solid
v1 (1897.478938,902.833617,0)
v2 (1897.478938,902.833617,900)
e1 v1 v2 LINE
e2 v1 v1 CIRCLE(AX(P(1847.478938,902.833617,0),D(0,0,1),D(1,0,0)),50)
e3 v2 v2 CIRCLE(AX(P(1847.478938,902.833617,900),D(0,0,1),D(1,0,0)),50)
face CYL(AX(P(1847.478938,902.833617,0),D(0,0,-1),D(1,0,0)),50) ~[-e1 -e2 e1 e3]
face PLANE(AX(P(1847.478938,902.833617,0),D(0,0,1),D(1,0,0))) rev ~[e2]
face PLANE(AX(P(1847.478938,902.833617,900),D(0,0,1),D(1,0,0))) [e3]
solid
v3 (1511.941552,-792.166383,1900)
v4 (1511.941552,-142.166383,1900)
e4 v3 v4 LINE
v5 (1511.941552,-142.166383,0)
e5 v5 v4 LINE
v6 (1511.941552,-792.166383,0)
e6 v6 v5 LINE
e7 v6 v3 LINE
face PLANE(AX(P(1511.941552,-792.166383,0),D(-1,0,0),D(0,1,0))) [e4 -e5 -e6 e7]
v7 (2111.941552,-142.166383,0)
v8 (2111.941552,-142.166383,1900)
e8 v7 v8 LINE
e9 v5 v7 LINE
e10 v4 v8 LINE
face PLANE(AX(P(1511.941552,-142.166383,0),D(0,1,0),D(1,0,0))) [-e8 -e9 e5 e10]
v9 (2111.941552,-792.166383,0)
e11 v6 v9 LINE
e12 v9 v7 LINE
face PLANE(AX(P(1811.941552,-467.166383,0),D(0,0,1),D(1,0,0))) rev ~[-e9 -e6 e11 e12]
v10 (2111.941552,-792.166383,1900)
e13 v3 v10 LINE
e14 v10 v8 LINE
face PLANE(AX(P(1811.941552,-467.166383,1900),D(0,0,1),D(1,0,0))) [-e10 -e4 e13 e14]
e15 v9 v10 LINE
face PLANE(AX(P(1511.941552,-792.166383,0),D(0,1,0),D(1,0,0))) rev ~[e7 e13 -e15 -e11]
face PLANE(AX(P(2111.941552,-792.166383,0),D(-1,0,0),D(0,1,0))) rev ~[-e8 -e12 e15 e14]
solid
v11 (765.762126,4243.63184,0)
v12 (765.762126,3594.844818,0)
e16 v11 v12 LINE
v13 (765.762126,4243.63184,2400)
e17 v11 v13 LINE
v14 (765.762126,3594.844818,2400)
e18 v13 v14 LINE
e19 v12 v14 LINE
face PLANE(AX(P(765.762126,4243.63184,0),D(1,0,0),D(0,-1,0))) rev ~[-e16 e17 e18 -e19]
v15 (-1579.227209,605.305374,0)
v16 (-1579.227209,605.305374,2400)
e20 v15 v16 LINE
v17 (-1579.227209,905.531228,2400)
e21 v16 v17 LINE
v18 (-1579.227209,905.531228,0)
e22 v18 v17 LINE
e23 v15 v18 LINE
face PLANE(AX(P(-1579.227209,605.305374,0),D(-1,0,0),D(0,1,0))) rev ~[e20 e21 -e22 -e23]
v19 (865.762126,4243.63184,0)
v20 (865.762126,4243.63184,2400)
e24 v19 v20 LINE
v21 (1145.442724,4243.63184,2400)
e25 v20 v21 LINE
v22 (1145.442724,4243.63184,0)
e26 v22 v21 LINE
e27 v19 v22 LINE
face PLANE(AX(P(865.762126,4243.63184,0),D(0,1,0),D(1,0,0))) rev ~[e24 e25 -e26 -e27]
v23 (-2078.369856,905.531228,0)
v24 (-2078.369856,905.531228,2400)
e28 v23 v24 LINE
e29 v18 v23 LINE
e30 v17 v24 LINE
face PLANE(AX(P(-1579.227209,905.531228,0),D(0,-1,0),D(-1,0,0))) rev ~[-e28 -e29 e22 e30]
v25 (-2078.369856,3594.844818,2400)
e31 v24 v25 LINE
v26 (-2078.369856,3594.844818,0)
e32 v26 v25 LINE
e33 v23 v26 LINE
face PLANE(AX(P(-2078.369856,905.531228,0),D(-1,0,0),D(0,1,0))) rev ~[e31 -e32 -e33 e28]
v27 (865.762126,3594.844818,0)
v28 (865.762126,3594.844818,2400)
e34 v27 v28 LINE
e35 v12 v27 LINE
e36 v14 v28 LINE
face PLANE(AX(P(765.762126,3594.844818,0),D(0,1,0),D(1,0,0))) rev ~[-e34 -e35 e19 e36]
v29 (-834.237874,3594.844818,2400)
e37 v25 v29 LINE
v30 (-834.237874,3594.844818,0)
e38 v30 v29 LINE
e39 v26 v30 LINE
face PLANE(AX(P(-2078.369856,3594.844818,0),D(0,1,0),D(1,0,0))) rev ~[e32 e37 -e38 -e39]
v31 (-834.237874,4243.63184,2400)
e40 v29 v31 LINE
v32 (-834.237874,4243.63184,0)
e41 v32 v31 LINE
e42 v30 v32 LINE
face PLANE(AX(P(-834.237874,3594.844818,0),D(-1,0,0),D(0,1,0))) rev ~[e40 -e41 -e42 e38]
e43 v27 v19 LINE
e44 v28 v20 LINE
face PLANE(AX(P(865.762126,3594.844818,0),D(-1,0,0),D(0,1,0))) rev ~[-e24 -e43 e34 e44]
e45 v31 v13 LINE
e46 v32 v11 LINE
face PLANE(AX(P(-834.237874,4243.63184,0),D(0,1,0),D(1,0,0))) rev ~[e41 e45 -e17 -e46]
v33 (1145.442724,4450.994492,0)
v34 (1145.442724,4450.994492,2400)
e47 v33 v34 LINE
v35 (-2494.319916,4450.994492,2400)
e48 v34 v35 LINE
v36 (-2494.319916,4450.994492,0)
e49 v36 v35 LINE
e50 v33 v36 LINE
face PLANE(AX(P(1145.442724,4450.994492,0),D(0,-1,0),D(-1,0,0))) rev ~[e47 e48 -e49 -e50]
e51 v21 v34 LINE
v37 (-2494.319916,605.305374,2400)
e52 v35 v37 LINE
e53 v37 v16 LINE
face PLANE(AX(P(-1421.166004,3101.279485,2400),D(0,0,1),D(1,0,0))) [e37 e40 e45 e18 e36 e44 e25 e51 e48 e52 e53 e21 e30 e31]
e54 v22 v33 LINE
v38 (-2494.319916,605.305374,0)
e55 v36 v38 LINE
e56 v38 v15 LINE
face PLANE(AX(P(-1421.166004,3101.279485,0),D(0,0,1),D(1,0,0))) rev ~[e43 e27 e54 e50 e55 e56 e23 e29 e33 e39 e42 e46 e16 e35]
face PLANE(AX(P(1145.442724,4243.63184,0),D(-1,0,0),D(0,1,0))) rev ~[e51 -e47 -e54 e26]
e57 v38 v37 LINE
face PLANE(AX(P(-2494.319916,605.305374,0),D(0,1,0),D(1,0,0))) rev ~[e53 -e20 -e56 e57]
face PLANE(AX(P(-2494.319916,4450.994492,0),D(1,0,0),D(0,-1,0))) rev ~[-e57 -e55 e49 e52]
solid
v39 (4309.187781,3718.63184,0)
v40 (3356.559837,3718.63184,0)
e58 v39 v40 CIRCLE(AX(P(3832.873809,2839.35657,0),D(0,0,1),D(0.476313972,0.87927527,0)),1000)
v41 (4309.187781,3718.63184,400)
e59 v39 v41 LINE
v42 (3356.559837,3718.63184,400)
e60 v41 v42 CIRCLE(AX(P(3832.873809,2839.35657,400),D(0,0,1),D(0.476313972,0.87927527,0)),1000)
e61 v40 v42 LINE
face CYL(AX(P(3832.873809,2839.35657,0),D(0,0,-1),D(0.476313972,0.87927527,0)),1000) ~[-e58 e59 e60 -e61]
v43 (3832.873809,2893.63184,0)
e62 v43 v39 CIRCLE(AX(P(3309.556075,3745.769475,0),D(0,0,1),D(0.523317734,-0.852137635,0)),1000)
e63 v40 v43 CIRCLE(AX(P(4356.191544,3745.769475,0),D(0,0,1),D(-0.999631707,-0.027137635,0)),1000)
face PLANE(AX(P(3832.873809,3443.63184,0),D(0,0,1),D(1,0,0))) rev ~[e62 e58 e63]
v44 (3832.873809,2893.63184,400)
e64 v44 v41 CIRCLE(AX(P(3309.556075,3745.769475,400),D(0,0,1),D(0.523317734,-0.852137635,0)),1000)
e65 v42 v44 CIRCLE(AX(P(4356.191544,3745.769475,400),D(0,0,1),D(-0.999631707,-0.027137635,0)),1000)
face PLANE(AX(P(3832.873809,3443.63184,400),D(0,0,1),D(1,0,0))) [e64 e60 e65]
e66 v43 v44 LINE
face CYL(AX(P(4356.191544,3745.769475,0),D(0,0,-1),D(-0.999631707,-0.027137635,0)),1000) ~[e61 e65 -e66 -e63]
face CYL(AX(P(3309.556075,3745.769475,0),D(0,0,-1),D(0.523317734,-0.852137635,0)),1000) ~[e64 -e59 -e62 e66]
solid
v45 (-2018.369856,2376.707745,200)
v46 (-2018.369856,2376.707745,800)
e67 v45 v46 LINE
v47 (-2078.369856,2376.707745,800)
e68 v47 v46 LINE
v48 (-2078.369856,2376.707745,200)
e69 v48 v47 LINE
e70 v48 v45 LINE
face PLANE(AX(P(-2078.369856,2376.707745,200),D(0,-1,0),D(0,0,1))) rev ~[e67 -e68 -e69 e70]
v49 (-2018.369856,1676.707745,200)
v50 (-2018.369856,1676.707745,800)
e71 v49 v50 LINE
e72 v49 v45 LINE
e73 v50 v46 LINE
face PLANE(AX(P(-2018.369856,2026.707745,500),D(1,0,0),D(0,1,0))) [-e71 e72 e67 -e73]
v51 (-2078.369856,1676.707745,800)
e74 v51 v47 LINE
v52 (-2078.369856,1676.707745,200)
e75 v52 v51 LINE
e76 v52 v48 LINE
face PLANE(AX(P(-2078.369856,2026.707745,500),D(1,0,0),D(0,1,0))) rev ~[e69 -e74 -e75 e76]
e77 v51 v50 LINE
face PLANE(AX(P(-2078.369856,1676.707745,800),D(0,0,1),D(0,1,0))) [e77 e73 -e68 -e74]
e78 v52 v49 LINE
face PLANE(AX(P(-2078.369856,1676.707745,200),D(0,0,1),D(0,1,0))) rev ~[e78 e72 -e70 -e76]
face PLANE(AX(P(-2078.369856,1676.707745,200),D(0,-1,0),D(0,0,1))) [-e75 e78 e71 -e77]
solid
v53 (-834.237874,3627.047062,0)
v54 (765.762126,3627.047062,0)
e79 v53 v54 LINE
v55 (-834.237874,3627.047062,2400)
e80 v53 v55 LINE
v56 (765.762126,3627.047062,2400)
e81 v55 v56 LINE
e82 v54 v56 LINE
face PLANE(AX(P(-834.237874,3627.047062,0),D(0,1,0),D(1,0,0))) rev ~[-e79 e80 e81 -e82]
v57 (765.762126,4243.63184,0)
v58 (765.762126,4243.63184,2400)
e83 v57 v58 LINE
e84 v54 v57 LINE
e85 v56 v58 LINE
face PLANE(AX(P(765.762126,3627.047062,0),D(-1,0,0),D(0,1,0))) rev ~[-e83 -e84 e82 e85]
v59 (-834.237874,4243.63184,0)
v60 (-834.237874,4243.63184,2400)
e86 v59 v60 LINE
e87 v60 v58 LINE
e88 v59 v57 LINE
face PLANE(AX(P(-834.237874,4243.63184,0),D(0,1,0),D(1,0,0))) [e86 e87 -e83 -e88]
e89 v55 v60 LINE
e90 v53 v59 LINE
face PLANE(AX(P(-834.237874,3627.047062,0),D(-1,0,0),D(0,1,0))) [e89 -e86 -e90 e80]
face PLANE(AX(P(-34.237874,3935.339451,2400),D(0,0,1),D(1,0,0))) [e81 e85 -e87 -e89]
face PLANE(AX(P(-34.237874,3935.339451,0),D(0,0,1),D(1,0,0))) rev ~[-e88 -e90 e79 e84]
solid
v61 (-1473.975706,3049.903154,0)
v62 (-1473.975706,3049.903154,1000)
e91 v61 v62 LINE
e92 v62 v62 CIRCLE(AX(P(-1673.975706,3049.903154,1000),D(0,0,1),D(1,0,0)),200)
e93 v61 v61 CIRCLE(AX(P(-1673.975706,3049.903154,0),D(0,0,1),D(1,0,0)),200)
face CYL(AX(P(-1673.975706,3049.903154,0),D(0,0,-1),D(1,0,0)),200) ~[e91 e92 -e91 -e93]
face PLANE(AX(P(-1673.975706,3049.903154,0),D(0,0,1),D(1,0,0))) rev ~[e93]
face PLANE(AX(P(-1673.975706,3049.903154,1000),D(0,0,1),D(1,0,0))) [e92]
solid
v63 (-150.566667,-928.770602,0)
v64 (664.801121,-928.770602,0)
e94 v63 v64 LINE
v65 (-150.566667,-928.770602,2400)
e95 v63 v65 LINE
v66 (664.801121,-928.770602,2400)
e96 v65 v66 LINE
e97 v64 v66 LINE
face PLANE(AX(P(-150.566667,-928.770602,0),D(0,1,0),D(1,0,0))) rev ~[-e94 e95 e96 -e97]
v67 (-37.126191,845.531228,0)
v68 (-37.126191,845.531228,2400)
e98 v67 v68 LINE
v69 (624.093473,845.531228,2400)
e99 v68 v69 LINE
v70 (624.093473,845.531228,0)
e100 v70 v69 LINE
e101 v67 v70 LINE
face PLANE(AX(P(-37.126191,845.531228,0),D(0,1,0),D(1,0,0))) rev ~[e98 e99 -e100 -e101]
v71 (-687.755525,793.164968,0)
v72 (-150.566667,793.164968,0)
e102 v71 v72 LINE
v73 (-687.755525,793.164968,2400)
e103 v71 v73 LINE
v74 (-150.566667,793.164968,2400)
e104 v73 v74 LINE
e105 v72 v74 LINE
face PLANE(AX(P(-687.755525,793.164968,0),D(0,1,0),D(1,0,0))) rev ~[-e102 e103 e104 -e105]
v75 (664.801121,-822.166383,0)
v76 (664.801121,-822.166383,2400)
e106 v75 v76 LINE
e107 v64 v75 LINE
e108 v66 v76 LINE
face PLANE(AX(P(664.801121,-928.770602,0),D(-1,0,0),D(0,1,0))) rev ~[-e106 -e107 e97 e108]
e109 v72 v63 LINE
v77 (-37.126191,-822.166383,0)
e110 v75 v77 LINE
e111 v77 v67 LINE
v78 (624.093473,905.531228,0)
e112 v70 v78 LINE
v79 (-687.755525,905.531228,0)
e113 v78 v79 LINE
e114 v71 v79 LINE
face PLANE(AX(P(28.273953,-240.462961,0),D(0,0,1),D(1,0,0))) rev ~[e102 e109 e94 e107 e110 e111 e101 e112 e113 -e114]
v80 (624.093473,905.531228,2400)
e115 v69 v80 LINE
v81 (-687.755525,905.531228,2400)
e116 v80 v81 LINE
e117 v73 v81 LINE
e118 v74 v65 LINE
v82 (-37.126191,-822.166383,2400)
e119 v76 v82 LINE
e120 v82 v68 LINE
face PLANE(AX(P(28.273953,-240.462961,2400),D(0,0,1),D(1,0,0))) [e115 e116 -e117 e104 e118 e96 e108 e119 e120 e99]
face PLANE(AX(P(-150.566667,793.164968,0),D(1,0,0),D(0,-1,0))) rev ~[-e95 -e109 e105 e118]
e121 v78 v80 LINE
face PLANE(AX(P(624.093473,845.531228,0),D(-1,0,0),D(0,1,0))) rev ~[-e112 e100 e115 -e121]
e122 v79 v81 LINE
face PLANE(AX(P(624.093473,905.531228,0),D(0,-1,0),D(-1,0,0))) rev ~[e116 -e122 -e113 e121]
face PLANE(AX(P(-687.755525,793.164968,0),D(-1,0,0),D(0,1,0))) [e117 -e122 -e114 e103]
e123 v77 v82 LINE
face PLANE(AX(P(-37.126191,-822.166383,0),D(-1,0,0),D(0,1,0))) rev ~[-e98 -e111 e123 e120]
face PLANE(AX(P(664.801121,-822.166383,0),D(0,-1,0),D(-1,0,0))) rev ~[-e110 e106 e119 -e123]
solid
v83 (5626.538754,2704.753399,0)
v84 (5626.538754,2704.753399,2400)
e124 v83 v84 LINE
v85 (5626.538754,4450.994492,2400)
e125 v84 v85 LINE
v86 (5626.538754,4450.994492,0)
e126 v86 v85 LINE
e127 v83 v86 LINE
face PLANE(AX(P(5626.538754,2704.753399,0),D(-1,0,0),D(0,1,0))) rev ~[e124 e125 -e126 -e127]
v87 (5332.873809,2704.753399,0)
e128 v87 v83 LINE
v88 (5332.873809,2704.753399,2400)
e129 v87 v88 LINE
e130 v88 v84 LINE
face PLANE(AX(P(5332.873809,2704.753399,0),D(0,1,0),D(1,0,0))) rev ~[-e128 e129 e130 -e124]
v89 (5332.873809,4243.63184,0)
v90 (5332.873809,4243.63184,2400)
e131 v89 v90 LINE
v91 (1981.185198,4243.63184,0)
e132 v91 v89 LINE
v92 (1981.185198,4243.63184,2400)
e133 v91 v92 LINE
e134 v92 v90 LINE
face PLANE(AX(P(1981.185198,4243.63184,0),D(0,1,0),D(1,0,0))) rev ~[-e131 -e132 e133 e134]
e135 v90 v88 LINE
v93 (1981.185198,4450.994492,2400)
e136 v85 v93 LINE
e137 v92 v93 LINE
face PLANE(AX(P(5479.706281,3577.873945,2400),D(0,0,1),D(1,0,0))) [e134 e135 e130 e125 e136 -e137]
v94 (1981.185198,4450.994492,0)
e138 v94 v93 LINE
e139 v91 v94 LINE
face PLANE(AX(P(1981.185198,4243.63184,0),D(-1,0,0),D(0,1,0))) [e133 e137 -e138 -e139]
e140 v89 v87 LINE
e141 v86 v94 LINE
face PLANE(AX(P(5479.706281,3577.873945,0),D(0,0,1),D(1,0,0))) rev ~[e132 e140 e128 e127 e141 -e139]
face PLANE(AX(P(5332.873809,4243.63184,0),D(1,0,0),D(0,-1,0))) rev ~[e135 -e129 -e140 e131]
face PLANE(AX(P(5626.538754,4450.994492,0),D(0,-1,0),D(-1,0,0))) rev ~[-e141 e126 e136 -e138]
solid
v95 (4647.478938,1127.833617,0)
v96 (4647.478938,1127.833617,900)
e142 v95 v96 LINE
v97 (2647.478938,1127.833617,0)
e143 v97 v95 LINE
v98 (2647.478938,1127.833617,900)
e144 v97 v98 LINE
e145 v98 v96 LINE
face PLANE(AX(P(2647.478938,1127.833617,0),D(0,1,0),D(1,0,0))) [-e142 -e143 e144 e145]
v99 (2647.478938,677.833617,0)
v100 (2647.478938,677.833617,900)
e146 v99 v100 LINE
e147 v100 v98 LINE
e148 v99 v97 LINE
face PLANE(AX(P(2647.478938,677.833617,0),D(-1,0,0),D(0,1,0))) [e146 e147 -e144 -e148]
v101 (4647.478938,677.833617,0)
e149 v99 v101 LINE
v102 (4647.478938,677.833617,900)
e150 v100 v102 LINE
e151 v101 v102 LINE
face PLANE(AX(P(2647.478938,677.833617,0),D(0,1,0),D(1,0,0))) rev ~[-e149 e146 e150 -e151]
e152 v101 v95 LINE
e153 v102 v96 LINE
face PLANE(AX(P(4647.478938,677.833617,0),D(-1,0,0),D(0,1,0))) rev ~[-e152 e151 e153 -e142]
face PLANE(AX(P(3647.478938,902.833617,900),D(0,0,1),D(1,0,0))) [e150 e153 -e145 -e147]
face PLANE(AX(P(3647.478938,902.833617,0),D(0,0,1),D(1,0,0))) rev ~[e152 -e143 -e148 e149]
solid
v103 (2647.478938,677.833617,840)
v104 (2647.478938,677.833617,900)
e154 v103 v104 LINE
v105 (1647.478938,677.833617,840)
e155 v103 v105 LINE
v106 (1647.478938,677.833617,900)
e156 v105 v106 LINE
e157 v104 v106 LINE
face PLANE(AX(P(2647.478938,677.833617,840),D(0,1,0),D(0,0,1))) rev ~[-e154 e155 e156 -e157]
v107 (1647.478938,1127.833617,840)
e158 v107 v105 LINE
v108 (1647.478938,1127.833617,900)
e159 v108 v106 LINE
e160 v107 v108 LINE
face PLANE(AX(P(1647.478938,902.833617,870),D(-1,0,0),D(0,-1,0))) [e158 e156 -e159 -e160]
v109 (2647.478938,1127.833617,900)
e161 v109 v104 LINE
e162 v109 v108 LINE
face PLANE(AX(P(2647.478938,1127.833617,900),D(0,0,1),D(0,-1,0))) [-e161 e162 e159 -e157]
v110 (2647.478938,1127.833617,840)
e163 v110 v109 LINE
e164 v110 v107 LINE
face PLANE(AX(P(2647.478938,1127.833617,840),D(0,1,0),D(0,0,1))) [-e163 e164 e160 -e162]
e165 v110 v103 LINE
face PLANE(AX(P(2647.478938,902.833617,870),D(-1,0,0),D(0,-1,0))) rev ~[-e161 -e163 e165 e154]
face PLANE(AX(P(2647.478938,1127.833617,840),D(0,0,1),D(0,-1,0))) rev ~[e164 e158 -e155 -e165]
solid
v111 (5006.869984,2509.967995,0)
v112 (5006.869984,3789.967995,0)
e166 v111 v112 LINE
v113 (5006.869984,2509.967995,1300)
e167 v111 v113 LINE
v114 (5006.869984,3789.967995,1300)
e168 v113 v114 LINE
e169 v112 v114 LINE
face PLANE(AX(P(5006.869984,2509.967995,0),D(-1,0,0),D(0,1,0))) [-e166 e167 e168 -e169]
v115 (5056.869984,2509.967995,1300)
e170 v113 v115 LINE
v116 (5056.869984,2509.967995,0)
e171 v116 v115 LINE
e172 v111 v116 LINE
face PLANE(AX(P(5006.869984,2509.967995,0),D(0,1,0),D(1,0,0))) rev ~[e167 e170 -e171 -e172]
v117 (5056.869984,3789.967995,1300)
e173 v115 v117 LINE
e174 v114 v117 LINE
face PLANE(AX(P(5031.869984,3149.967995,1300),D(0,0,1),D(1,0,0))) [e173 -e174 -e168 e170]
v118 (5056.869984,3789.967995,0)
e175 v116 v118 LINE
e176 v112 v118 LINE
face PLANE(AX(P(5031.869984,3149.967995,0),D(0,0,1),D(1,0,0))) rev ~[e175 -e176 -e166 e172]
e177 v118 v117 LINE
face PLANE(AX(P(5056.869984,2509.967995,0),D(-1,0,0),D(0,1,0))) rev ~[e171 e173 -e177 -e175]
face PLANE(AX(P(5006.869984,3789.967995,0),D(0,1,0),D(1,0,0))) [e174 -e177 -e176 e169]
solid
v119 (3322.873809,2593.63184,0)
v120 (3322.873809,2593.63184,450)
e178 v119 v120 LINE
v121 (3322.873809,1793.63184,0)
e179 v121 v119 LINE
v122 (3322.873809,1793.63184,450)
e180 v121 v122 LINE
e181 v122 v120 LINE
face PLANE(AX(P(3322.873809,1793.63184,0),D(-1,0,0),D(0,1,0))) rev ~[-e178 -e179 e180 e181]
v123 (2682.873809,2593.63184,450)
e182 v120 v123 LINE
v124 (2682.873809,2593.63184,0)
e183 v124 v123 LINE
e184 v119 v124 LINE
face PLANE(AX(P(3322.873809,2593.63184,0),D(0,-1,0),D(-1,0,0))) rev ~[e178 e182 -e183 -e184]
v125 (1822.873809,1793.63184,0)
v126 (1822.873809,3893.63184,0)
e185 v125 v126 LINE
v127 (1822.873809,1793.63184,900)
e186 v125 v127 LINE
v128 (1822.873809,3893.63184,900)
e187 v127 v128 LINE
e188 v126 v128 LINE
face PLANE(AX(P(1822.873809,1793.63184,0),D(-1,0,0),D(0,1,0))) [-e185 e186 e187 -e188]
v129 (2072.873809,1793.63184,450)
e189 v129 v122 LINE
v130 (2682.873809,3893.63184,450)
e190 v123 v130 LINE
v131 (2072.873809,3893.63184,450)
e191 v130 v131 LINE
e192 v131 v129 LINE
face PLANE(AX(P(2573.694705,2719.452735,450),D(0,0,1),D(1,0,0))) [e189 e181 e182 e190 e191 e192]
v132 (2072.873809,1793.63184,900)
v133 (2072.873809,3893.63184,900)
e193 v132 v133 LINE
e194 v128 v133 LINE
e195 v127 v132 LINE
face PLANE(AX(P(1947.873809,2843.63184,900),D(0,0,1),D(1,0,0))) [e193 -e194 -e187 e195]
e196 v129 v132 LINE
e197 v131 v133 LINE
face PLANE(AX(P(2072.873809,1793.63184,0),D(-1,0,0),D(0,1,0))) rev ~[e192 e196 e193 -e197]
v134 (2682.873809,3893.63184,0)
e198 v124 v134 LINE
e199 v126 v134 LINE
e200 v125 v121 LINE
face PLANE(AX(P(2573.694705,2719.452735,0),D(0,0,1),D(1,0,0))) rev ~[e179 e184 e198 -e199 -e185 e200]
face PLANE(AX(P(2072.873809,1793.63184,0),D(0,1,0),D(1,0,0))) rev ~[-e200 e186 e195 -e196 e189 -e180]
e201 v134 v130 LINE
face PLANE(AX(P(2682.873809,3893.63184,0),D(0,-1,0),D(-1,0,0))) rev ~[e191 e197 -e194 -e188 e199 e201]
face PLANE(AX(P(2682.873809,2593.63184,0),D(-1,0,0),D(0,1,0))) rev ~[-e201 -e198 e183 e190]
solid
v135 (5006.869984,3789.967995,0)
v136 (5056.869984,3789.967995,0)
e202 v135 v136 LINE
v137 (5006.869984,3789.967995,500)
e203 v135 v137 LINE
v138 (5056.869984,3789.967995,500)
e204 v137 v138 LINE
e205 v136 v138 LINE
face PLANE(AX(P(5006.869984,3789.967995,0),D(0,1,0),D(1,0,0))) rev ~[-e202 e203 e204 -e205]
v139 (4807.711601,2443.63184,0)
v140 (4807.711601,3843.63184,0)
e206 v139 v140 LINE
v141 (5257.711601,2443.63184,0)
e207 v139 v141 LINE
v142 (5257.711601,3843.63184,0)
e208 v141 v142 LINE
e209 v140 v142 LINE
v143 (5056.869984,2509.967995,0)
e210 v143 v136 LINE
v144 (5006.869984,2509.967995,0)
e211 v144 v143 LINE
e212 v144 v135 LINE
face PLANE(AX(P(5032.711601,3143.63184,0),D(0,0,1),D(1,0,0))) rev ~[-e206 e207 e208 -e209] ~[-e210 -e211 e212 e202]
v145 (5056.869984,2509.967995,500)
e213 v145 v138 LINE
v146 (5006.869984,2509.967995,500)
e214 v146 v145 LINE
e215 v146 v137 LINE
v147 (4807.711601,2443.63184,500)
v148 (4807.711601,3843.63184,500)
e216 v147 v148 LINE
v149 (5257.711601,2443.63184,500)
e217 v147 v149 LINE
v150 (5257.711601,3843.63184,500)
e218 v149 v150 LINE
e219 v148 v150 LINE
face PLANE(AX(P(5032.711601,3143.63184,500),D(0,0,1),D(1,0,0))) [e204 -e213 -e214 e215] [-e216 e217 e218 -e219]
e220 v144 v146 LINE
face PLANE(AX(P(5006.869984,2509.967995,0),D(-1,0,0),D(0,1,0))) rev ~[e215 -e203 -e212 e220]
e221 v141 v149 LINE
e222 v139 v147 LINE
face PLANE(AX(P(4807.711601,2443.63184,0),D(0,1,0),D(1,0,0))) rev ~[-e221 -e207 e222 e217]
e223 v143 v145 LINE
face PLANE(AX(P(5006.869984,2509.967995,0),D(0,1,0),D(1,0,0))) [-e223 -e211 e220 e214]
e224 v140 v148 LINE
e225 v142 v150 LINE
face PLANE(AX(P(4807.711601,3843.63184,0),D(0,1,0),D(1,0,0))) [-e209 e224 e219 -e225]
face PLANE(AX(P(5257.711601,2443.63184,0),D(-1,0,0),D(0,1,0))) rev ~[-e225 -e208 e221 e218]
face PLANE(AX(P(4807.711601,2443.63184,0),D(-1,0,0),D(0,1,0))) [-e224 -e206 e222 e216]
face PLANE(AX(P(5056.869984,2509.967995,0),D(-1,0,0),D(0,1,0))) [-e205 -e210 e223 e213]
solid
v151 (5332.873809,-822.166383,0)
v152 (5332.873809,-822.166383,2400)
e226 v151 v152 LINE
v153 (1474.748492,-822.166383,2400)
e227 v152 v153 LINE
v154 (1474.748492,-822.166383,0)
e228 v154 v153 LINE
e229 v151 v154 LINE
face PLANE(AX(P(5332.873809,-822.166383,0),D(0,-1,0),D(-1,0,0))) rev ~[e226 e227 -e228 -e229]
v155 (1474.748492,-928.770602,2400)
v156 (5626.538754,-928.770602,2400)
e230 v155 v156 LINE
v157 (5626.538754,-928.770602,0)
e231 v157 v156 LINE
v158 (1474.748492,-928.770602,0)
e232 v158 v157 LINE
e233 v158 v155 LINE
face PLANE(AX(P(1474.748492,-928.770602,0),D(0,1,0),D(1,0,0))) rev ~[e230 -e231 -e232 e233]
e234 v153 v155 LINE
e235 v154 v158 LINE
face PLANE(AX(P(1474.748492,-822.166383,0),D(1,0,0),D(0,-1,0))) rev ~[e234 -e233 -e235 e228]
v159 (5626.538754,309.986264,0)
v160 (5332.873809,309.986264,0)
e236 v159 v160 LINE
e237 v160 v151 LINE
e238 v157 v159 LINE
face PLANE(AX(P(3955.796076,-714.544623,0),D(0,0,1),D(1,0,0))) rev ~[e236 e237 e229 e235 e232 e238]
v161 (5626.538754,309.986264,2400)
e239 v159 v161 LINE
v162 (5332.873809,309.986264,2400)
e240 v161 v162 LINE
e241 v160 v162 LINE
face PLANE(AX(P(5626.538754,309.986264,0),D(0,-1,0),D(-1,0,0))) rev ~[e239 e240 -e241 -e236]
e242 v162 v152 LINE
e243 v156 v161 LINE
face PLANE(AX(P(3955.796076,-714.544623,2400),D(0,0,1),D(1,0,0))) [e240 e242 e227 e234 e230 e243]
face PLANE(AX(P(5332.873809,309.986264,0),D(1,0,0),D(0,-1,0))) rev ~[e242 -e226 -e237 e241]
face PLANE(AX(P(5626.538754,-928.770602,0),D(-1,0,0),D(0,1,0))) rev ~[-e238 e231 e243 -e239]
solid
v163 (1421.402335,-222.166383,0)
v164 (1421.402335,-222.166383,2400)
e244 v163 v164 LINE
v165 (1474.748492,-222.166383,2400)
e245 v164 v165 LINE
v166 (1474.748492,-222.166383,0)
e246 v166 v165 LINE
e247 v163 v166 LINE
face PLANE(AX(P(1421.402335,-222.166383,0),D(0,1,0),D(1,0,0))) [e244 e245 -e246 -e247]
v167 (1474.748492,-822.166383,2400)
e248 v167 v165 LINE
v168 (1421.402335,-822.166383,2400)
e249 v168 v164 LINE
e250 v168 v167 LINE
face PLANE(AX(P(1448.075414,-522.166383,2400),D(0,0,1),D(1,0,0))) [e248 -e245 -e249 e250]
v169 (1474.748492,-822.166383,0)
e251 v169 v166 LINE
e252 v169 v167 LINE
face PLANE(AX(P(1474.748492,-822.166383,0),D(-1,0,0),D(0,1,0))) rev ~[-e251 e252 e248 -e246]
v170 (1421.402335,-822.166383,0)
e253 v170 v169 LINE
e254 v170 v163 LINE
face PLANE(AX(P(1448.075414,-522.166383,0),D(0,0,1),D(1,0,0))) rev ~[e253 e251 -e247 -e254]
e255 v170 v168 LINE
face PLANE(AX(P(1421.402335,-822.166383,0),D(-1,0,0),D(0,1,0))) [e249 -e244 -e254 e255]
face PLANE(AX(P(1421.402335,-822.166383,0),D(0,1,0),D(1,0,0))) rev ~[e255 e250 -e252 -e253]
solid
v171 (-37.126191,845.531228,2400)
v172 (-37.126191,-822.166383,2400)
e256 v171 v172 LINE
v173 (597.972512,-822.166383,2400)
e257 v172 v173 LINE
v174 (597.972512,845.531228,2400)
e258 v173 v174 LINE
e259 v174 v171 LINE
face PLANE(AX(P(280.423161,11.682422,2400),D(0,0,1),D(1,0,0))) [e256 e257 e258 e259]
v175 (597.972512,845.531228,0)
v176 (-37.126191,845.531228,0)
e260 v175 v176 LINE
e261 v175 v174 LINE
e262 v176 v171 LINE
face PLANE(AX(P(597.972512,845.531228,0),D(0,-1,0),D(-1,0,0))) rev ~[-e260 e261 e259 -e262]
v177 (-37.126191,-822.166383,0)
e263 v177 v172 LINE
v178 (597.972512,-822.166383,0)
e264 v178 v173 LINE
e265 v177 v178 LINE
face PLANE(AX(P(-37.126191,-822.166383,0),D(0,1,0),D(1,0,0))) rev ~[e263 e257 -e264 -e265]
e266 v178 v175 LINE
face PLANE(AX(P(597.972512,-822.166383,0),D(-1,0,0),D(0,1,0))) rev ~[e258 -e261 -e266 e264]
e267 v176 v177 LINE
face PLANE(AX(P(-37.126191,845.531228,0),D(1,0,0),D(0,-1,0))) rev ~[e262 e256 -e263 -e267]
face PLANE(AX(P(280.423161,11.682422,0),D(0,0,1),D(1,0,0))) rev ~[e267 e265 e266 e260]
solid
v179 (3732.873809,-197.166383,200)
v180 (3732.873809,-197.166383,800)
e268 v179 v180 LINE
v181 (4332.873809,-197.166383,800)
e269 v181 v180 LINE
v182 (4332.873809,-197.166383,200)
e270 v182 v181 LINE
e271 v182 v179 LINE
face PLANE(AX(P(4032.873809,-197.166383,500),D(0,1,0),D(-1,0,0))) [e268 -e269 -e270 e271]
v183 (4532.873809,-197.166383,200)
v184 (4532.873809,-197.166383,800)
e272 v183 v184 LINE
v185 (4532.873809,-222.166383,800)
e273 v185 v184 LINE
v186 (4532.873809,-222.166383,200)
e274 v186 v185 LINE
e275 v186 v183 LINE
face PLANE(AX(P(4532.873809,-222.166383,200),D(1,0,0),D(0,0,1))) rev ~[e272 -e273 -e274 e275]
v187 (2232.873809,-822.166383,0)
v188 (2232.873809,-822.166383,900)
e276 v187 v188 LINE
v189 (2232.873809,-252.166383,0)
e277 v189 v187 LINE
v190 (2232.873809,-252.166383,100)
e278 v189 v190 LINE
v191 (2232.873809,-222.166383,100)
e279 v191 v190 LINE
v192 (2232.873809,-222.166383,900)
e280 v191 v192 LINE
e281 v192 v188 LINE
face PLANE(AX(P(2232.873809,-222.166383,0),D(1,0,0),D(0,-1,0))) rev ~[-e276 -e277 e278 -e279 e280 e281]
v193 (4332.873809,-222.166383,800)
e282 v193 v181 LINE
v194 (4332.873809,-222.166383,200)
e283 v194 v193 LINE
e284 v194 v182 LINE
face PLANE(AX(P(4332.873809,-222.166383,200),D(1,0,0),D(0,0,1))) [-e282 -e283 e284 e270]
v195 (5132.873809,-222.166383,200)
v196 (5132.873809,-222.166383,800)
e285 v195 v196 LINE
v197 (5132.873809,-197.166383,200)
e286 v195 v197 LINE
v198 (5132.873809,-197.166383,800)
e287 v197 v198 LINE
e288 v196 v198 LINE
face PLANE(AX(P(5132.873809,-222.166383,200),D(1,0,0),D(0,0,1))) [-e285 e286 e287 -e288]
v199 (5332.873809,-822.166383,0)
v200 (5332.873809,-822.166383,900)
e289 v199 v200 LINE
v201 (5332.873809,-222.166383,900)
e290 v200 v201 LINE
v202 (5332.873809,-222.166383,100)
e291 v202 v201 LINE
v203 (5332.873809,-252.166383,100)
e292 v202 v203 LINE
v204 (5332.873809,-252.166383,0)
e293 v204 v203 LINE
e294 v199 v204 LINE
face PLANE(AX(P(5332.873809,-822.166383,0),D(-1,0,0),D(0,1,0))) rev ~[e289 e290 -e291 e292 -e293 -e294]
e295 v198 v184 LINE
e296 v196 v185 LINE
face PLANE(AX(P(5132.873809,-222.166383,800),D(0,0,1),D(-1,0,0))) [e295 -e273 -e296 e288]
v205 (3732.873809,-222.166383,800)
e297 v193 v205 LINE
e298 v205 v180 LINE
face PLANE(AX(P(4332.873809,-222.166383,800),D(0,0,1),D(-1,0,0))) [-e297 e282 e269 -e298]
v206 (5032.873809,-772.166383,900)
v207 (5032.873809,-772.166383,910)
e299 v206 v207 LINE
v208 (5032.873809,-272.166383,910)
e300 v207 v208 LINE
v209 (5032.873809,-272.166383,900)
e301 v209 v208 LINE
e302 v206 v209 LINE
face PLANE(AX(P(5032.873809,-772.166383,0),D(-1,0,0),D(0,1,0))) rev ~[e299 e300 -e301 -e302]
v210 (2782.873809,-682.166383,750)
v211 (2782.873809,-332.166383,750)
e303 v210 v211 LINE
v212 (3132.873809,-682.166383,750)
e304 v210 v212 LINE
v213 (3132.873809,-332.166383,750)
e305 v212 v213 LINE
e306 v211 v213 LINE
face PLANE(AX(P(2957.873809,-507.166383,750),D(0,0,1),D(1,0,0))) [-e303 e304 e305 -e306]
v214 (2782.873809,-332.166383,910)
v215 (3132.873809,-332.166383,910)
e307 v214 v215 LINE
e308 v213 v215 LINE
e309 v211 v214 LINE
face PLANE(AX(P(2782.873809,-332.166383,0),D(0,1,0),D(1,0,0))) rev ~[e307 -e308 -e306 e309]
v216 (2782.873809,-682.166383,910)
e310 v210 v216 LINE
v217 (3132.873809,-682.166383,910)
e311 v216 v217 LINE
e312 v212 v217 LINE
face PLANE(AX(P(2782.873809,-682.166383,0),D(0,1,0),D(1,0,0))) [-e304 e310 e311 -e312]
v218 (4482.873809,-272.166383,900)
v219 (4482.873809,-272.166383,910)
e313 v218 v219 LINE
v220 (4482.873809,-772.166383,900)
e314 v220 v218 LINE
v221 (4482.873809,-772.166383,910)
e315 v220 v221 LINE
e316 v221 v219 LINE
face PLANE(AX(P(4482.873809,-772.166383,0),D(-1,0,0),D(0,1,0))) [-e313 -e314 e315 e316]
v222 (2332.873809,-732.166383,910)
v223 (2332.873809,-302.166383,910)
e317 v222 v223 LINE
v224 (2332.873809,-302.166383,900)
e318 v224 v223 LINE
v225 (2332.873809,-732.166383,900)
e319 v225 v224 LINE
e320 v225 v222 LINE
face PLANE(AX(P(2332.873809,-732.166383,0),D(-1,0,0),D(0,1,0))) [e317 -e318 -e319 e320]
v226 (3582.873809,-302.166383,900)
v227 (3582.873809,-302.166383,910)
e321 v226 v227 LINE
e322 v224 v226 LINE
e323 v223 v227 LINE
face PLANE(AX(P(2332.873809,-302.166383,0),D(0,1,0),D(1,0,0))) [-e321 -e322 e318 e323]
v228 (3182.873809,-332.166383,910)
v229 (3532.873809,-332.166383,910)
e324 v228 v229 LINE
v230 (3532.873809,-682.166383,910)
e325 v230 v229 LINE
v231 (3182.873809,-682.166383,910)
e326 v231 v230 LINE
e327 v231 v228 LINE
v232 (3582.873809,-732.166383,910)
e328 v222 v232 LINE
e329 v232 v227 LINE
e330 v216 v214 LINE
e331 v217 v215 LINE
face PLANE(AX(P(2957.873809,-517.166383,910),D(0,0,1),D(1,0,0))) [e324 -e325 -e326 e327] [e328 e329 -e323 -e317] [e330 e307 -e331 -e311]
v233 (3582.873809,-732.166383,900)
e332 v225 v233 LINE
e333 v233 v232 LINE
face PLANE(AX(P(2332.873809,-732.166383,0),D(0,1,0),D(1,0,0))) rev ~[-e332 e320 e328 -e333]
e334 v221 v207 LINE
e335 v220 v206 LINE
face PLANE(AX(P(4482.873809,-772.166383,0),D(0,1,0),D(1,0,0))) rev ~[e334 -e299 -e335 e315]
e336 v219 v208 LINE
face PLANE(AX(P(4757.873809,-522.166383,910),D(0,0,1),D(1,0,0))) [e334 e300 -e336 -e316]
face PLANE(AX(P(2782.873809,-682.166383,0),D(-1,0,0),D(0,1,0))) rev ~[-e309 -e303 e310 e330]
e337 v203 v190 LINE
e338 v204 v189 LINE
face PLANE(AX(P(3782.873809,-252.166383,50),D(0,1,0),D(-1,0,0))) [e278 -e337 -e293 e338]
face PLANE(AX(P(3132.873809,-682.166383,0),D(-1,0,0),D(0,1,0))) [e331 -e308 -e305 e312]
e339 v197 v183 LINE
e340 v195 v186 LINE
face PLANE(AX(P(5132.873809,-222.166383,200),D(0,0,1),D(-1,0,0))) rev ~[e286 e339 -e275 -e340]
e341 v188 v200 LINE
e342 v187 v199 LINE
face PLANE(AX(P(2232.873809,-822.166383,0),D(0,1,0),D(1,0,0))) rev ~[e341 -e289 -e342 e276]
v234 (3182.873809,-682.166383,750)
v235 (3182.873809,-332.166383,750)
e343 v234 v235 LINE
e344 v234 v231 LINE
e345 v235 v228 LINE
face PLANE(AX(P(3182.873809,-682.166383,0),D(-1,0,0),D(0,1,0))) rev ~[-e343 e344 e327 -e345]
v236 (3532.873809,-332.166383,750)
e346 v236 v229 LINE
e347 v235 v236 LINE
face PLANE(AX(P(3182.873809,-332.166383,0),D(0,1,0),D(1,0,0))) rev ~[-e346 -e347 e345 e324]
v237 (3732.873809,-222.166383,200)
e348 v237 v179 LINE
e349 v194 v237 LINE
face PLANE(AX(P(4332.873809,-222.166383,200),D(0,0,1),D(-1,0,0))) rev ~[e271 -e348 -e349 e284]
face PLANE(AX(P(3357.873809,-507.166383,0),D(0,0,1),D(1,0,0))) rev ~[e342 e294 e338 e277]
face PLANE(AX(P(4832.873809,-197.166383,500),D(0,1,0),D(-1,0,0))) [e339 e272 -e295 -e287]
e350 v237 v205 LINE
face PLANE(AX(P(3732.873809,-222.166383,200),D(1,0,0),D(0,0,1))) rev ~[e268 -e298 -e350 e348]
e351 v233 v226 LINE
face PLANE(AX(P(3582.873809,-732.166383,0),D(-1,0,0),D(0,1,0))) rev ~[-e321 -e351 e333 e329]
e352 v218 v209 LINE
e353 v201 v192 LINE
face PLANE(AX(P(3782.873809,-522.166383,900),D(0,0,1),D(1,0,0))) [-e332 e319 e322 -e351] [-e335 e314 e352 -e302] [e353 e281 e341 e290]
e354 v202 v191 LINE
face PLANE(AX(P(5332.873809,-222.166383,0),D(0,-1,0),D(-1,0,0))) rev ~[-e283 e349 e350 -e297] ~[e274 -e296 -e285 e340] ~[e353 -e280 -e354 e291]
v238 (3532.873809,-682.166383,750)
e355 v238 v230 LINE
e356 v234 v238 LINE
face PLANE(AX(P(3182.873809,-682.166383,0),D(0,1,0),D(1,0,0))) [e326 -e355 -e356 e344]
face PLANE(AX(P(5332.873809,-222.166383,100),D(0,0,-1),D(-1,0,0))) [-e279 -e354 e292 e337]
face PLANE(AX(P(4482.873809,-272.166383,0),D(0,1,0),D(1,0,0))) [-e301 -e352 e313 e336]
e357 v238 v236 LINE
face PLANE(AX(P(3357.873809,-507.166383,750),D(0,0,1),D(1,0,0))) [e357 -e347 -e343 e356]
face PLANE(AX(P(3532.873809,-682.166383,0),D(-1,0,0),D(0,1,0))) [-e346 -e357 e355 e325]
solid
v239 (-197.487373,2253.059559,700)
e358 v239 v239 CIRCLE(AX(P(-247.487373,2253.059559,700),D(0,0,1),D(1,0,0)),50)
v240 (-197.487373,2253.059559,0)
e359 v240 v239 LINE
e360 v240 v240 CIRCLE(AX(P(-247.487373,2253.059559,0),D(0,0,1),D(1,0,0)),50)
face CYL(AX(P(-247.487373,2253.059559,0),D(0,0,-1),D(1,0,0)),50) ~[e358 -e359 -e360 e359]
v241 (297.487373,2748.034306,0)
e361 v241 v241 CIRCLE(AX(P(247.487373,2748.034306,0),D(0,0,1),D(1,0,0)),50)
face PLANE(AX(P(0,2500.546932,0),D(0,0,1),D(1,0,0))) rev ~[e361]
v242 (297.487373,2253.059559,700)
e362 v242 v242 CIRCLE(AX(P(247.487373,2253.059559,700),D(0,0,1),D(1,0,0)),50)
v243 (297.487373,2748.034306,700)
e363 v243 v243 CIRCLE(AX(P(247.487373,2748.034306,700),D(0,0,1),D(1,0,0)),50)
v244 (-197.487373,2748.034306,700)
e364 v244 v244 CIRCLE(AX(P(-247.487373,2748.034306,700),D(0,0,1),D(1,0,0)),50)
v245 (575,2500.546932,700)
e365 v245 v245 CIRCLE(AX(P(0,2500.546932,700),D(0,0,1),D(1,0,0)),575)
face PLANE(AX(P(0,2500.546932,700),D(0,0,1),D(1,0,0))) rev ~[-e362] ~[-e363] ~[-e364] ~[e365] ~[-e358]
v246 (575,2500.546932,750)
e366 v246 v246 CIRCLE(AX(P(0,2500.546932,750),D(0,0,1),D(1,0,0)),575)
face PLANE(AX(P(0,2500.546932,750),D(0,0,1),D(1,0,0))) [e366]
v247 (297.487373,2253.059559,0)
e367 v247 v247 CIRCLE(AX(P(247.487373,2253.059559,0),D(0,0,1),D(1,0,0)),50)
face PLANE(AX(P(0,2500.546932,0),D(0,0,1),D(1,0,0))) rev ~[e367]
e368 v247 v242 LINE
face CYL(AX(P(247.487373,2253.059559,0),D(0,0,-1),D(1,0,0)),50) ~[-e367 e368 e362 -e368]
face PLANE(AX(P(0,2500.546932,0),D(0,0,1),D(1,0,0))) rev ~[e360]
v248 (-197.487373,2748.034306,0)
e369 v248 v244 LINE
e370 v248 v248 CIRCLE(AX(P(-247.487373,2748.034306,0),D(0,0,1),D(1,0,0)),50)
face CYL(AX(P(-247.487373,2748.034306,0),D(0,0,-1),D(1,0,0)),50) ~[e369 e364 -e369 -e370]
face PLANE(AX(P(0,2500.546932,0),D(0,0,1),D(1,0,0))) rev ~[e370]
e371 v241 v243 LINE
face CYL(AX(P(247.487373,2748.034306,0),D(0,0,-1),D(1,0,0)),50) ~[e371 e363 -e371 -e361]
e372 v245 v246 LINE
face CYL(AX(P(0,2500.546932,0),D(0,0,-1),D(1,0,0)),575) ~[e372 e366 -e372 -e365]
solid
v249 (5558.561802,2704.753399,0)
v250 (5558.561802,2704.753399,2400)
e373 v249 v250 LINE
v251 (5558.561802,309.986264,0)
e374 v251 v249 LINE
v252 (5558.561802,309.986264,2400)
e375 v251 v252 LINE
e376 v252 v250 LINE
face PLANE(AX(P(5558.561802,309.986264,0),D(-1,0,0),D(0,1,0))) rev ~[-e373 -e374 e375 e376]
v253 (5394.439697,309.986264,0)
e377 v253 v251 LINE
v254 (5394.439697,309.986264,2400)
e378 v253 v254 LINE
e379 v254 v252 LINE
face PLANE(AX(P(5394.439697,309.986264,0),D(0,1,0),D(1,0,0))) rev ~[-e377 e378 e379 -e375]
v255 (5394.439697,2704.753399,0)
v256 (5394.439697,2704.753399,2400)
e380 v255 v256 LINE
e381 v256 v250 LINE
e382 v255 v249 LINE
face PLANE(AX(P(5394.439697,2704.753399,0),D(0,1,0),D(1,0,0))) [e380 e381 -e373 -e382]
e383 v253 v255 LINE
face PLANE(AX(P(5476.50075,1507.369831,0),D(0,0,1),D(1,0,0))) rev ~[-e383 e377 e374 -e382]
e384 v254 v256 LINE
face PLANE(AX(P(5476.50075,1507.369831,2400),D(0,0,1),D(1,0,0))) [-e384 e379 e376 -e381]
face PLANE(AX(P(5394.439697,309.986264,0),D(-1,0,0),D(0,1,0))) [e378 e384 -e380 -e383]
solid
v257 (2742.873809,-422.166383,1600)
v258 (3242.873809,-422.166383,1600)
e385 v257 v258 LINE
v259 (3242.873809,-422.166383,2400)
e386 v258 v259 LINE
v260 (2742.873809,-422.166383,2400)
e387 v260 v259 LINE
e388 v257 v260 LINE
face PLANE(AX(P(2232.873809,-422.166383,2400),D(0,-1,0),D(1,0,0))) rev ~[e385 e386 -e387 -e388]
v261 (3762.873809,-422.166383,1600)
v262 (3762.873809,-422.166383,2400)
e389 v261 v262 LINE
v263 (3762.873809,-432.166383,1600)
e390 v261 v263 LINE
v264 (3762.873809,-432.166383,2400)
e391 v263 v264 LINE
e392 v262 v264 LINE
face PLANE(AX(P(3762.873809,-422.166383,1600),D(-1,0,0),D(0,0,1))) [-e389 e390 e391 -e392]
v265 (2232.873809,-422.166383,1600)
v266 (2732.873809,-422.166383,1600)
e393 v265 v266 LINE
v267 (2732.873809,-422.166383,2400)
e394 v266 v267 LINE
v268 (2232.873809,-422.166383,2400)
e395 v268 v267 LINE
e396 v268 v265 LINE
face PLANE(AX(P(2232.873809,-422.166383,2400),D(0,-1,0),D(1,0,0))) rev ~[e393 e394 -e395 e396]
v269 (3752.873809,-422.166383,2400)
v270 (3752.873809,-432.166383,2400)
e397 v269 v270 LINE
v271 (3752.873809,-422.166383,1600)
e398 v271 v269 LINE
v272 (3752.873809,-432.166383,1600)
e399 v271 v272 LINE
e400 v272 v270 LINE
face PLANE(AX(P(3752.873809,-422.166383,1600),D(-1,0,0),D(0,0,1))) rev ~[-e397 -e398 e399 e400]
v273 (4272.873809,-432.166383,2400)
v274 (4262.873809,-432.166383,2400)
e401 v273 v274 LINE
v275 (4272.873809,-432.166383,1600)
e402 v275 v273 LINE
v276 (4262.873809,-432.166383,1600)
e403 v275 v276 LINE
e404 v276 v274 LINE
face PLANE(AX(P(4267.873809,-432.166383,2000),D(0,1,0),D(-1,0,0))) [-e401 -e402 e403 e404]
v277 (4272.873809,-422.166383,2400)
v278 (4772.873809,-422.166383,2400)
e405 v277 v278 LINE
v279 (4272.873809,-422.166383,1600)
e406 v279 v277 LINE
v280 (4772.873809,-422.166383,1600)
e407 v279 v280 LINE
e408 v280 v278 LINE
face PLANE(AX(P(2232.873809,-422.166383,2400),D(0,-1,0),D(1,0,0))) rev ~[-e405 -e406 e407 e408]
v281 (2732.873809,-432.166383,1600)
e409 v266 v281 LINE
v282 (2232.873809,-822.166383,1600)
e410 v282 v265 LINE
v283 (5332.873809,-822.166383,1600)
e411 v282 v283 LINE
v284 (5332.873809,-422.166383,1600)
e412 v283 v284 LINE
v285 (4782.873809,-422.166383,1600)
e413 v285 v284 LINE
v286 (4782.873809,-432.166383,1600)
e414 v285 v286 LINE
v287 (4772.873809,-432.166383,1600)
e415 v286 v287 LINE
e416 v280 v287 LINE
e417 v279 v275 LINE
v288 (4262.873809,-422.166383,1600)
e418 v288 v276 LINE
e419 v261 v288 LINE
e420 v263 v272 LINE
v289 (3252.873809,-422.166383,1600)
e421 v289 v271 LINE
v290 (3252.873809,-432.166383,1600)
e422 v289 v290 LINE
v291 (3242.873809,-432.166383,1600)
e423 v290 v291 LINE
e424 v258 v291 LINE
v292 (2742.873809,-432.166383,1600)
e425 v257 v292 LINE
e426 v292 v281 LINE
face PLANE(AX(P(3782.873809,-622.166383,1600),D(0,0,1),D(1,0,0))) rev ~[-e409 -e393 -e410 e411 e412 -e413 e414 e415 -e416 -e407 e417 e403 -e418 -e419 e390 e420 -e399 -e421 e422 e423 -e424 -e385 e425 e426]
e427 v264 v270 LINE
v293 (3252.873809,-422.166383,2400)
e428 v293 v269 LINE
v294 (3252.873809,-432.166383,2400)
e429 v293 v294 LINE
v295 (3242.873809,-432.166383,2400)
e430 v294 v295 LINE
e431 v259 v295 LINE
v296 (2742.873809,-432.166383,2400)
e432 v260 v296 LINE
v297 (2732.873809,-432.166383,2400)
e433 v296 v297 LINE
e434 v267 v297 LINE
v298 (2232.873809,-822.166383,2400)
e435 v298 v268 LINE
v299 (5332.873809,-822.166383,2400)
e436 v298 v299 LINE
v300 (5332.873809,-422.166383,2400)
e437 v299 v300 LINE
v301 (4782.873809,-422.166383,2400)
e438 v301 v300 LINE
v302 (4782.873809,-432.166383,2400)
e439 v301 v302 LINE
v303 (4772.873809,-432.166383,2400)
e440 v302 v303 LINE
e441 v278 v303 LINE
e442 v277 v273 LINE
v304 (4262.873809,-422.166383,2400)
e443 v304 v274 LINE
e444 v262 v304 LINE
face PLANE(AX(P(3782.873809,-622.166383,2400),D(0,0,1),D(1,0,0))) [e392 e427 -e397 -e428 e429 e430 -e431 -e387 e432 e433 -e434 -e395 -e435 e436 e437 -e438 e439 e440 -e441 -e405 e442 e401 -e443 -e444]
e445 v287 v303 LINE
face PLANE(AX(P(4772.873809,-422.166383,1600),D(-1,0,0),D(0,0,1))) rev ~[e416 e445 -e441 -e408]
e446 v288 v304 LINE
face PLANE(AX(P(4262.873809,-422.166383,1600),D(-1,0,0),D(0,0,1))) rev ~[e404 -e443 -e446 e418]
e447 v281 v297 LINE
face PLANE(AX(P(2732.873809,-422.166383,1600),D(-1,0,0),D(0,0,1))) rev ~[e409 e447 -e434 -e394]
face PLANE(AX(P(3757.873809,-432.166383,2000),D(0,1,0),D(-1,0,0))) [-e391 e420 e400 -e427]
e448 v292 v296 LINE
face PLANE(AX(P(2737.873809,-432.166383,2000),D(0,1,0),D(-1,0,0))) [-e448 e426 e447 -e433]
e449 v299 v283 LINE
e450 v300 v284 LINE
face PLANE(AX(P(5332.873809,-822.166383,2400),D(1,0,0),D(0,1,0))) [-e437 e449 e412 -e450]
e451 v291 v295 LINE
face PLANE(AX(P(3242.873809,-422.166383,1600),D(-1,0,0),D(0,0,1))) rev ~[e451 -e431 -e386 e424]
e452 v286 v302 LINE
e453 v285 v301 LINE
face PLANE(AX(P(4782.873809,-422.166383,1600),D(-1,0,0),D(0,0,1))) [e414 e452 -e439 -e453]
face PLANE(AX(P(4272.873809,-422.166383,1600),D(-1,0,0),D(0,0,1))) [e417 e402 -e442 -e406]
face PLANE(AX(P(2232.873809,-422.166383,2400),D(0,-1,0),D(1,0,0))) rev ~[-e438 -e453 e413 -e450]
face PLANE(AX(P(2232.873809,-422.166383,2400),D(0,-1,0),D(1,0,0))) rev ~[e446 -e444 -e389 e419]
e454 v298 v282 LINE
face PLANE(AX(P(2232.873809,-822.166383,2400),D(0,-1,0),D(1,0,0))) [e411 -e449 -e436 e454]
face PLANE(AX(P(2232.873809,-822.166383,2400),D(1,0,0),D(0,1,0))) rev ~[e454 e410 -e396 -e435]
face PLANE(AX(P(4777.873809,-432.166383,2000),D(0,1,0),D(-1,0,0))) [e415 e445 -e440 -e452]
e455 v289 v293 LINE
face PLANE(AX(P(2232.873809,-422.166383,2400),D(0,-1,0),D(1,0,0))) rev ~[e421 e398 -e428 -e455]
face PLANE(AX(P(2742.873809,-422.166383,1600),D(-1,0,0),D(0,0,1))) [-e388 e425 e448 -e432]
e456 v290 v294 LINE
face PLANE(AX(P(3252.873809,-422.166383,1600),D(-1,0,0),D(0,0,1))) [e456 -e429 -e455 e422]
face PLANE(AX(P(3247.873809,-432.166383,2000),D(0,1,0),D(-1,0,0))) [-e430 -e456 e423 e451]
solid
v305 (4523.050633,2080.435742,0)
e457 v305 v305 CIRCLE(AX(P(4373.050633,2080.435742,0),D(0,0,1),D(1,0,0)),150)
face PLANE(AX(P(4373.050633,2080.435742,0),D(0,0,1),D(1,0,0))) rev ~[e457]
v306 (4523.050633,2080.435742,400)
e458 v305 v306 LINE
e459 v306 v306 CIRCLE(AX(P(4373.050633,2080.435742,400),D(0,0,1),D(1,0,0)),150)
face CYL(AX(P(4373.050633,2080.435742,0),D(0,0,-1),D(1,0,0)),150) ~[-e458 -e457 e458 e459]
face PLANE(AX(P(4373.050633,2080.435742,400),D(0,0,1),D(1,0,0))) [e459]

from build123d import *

# Parameters (mm, degrees)
F0_W      = 3351.6886112094
F0_H      = 207.362651825
F1_DEPTH  = 2400
F0_W_2    = 537.1888577938
F0_H_2    = 112.3662590981
F0_W_3    = 53.346157074
F0_H_3    = 600
F0_W_4    = 1250
F0_H_4    = 430
F0_W_5    = 550
F0_H_5    = 500
F2_DEPTH  = 900
F0_W_6    = 2000
F0_H_6    = 450
F0_R      = 50
F3_W      = 3100
F3_H      = 400
F4_DEPTH  = 800
F0_W_7    = 600
F0_H_7    = 650
F5_DEPTH  = 1900
F0_W_8    = 250
F0_H_8    = 2100
F6_DEPTH  = 900
F7_DEPTH  = 450
F0_W_9    = 350
F0_H_9    = 350
F8_DEPTH  = 910
F9_DEPTH  = 750
F10_DEPTH = 910
F11_W     = 450
F11_H     = 60
F12_DEPTH = 1000
F0_W_10   = 164.1221046448
F0_H_10   = 2394.7671353817
F13_DEPTH = 2400
F0_R_2    = 575
F14_DEPTH = 750
F15_DEPTH = 700
F17_DEPTH = 400
F0_R_3    = 150
F18_W     = 600
F18_H     = 600
F19_DEPTH = 25
F18_W_2   = 3100
F18_H_2   = 100
F20_DEPTH = 30
F21_W     = 10
F21_H     = 800
F22_DEPTH = 10
F23_W     = 700
F23_H     = 600
F24_DEPTH = 60
F0_W_11   = 1600
F0_H_11   = 616.584777832
F25_DEPTH = 2400
F0_R_4    = 200
F26_DEPTH = 1000
F0_W_12   = 450
F0_H_12   = 1400
F0_W_13   = 50
F0_H_13   = 1280
F27_DEPTH = 500
F28_DEPTH = 1300


# Not quite as in the source:
# - a feature names something its author has since deleted; it is built from what else it names


with BuildPart() as f1:
    # F0 (on Top) → F1 (new body)
    with BuildSketch(Plane.XY):
        Polygon((5332.8738090396, 2704.7533988953), (5394.4396972656, 2704.7533988953), (5558.5618019104, 2704.7533988953), (5626.5387535095, 2704.7533988953), (5626.5387535095, 4450.9944915771), (5332.8738090396, 4450.9944915771), (5332.8738090396, 4243.6318397522), align=None)
        with Locations((3657.0295034349, 4347.3131656647)):
            Rectangle(F0_W, F0_H)
    extrude(amount=F1_DEPTH)


with BuildPart() as f1b:
    # F0 (on Top) → F1, piece 2 (new body)
    with BuildSketch(Plane.XY):
        Polygon((5332.8738090396, -222.1663832664), (5332.8738090396, -822.1663832664), (2232.8738090396, -822.1663832664), (1474.7484922409, -822.1663832664), (1474.7484922409, -928.7706017494), (5626.5387535095, -928.7706017494), (5626.5387535095, 309.9862635136), (5558.5618019104, 309.9862635136), (5394.4396972656, 309.9862635136), (5332.8738090396, 309.9862635136), align=None)
    extrude(amount=F1_DEPTH)


with BuildPart() as f1c:
    # F0 (on Top) → F1, piece 3 (new body)
    with BuildSketch(Plane.XY):
        Polygon((597.9725122452, -822.1663832664), (-37.1261909604, -822.1663832664), (-37.1261909604, -26.347534731), (-37.1261909604, 845.5312275887), (-37.1261909604, 905.5312275887), (-150.5666673183, 905.5312275887), (-150.5666673183, 793.1649684906), (-150.5666673183, -928.7706017494), (664.8011207581, -928.7706017494), (664.8011207581, -822.1663832664), align=None)
        with Locations((-419.1610962152, 849.3480980396)):
            Rectangle(F0_W_2, F0_H_2)
        Polygon((-37.1261909604, 845.5312275887), (597.9725122452, 845.5312275887), (624.0934729576, 845.5312275887), (624.0934729576, 905.5312275887), (597.9725122452, 905.5312275887), (-37.1261909604, 905.5312275887), align=None)
    extrude(amount=F1_DEPTH)


with BuildPart() as f1d:
    # F0 (on Top) → F1, piece 4 (new body)
    with BuildSketch(Plane.XY):
        with Locations((1448.0754137039, -522.1663832664)):
            Rectangle(F0_W_3, F0_H_3)
    extrude(amount=F1_DEPTH)


with BuildPart() as f1e:
    # F0 (on Top) → F1, piece 5 (new body)
    with BuildSketch(Plane.XY):
        Polygon((865.7621264458, 4243.6318397522), (1145.4427242279, 4243.6318397522), (1145.4427242279, 4450.9944915771), (-2494.3199157715, 4450.9944915771), (-2494.3199157715, 605.3053736687), (-1579.2272090912, 605.3053736687), (-1579.2272090912, 905.5312275887), (-2078.3698558807, 905.5312275887), (-2078.3698558807, 3594.8448181152), (-834.2378735542, 3594.8448181152), (-834.2378735542, 3627.0470619202), (-834.2378735542, 4243.6318397522), (765.7621264458, 4243.6318397522), align=None)
        Polygon((865.7621264458, 3594.8448181152), (865.7621264458, 4243.6318397522), (765.7621264458, 4243.6318397522), (765.7621264458, 3627.0470619202), (765.7621264458, 3594.8448181152), align=None)
    extrude(amount=F1_DEPTH)


with BuildPart() as f2:
    # F0 (on Top) → F2 (new body)
    with BuildSketch(Plane.XY):
        Polygon((2232.8738090396, -822.1663832664), (5332.8738090396, -822.1663832664), (5332.8738090396, -222.1663832664), (4732.8738090396, -222.1663832664), (2232.8738090396, -222.1663832664), align=None)
        with Locations((2957.8738090396, -517.1663832664)):
            Rectangle(F0_W_4, F0_H_4, mode=Mode.SUBTRACT)
        with Locations((4757.8738090396, -522.1663832664)):
            Rectangle(F0_W_5, F0_H_5, mode=Mode.SUBTRACT)
    extrude(amount=F2_DEPTH)

    # F0 (on Top) → F8 (join)
    with BuildSketch(Plane.XY):
        with Locations((2957.8738090396, -517.1663832664)):
            Rectangle(F0_W_4, F0_H_4)
        with Locations((2957.8738090396, -507.1663832664)):
            Rectangle(F0_W_9, F0_H_9, mode=Mode.SUBTRACT)
        with Locations((3357.8738090396, -507.1663832664)):
            Rectangle(F0_W_9, F0_H_9, mode=Mode.SUBTRACT)
    extrude(amount=F8_DEPTH)

    # F0 (on Top) → F9 (join)
    with BuildSketch(Plane.XY):
        with Locations((3357.8738090396, -507.1663832664)):
            Rectangle(F0_W_9, F0_H_9)
        with Locations((2957.8738090396, -507.1663832664)):
            Rectangle(F0_W_9, F0_H_9)
    extrude(amount=F9_DEPTH)

    # F0 (on Top) → F10 (join)
    with BuildSketch(Plane.XY):
        with Locations((4757.8738090396, -522.1663832664)):
            Rectangle(F0_W_5, F0_H_5)
    extrude(amount=F10_DEPTH)

    # F18 (on face) → F19 (join)
    with BuildSketch(Plane(origin=(0, -222.1663832664, 0), x_dir=(-1, 0, 0), z_dir=(0, 1, 0))):
        with Locations((-4832.8738090396, 500)):
            Rectangle(F18_W, F18_H)
        with Locations((-4032.8738090396, 500)):
            Rectangle(F18_W, F18_H)
    extrude(amount=F19_DEPTH)

    # F18 (on face) → F20 (cut)
    with BuildSketch(Plane(origin=(0, -222.1663832664, 0), x_dir=(-1, 0, 0), z_dir=(0, 1, 0))):
        with Locations((-3782.8738090396, 50)):
            Rectangle(F18_W_2, F18_H_2)
    extrude(amount=-F20_DEPTH, mode=Mode.SUBTRACT)


with BuildPart() as f2b:
    # F0 (on Top) → F2, piece 2 (new body)
    with BuildSketch(Plane.XY):
        with Locations((3647.4789381027, 902.8336167336)):
            Rectangle(F0_W_6, F0_H_6)
    extrude(amount=F2_DEPTH)


with BuildPart() as f2c:
    # F0 (on Top) → F2, piece 3 (new body)
    with BuildSketch(Plane.XY):
        with Locations((1847.4789381027, 902.8336167336)):
            Circle(F0_R)
    extrude(amount=F2_DEPTH)


with BuildPart() as f4:
    # F3 (on face) → F4 (new body)
    with BuildSketch(Plane.XY.offset(2400)):
        with Locations((3782.8738090396, -622.1663832664)):
            Rectangle(F3_W, F3_H)
    extrude(amount=-F4_DEPTH)

    # F21 (on face) → F22 (cut)
    with BuildSketch(Plane(origin=(0, -422.1663832664, 0), x_dir=(-1, 0, 0), z_dir=(0, 1, 0))):
        with Locations((-2737.8738090396, 2000)):
            Rectangle(F21_W, F21_H)
        with Locations((-3247.8738090396, 2000)):
            Rectangle(F21_W, F21_H)
        with Locations((-3757.8738090396, 2000)):
            Rectangle(F21_W, F21_H)
        with Locations((-4267.8738090396, 2000)):
            Rectangle(F21_W, F21_H)
        with Locations((-4777.8738090396, 2000)):
            Rectangle(F21_W, F21_H)
    extrude(amount=-F22_DEPTH, mode=Mode.SUBTRACT)


with BuildPart() as f5:
    # F0 (on Top) → F5 (new body)
    with BuildSketch(Plane.XY):
        with Locations((1811.9415521622, -467.1663832664)):
            Rectangle(F0_W_7, F0_H_7)
    extrude(amount=F5_DEPTH)


with BuildPart() as f6:
    # F0 (on Top) → F6 (new body)
    with BuildSketch(Plane.XY):
        with Locations((1947.8738090396, 2843.6318397522)):
            Rectangle(F0_W_8, F0_H_8)
    extrude(amount=F6_DEPTH)

    # F0 (on Top) → F7 (join)
    with BuildSketch(Plane.XY):
        Polygon((2072.8738090396, 3893.6318397522), (2072.8738090396, 1793.6318397522), (3322.8738090396, 1793.6318397522), (3322.8738090396, 2593.6318397522), (2682.8738090396, 2593.6318397522), (2682.8738090396, 3893.6318397522), align=None)
    extrude(amount=F7_DEPTH)


with BuildPart() as f12:
    # F11 (on face) → F12 (new body)
    with BuildSketch(Plane(origin=(2647.4789381027, 0, 0), x_dir=(0, -1, 0), z_dir=(-1, 0, 0))):
        with Locations((-902.8336167336, 870)):
            Rectangle(F11_W, F11_H)
    extrude(amount=F12_DEPTH)


with BuildPart() as f13:
    # F0 (on Top) → F13 (new body)
    with BuildSketch(Plane.XY):
        with Locations((5476.500749588, 1507.3698312044)):
            Rectangle(F0_W_10, F0_H_10)
    extrude(amount=F13_DEPTH)


with BuildPart() as f14:
    # F0 (on Top) → F14 (new body)
    with BuildSketch(Plane.XY):
        with Locations((0, 2500.5469322205)):
            Circle(F0_R_2)
        with Locations((-247.4873734153, 2253.0595588052)):
            Circle(F0_R, mode=Mode.SUBTRACT)
        with Locations((247.4873734153, 2253.0595588052)):
            Circle(F0_R, mode=Mode.SUBTRACT)
        with Locations((-247.4873734153, 2748.0343056358)):
            Circle(F0_R, mode=Mode.SUBTRACT)
        with Locations((247.4873734153, 2748.0343056358)):
            Circle(F0_R, mode=Mode.SUBTRACT)
        with Locations((247.4873734153, 2748.0343056358)):
            Circle(F0_R)
        with Locations((247.4873734153, 2253.0595588052)):
            Circle(F0_R)
        with Locations((-247.4873734153, 2748.0343056358)):
            Circle(F0_R)
        with Locations((-247.4873734153, 2253.0595588052)):
            Circle(F0_R)
    extrude(amount=F14_DEPTH)


with BuildPart() as f15:
    # F0 (on Top) → F15 (new body)
    with BuildSketch(Plane.XY):
        with Locations((0, 2500.5469322205)):
            Circle(F0_R_2)
        with Locations((-247.4873734153, 2253.0595588052)):
            Circle(F0_R, mode=Mode.SUBTRACT)
        with Locations((247.4873734153, 2253.0595588052)):
            Circle(F0_R, mode=Mode.SUBTRACT)
        with Locations((-247.4873734153, 2748.0343056358)):
            Circle(F0_R, mode=Mode.SUBTRACT)
        with Locations((247.4873734153, 2748.0343056358)):
            Circle(F0_R, mode=Mode.SUBTRACT)
    extrude(amount=F15_DEPTH)


with BuildPart() as f14_1:
    add(f14.part)

    # F16: cut F15
    add(f15.part, mode=Mode.SUBTRACT)


with BuildPart() as f17:
    # F0 (on Top) → F17 (new body)
    with BuildSketch(Plane.XY):
        with BuildLine():
            ThreePointArc((3356.5598369582, 3718.6318397522), (3490.1661397403, 3245.7694746289), (3832.8738090396, 2893.6318397522))
            ThreePointArc((3832.8738090396, 2893.6318397522), (4175.5814783389, 3245.7694746289), (4309.187781121, 3718.6318397522))
            ThreePointArc((4309.187781121, 3718.6318397522), (3832.8738090396, 3839.3565699987), (3356.5598369582, 3718.6318397522))
        make_face()
    extrude(amount=F17_DEPTH)


with BuildPart() as f17b:
    # F0 (on Top) → F17, piece 2 (new body)
    with BuildSketch(Plane.XY):
        with Locations((4373.0506326787, 2080.4357423588)):
            Circle(F0_R_3)
    extrude(amount=F17_DEPTH)


with BuildPart() as f24:
    # F23 (on face) → F24 (new body)
    with BuildSketch(Plane.YZ.offset(-2078.3698558807)):
        with Locations((2026.7077445984, 500)):
            Rectangle(F23_W, F23_H)
    extrude(amount=F24_DEPTH)


with BuildPart() as f25:
    # F0 (on Top) → F25 (new body)
    with BuildSketch(Plane.XY):
        with Locations((-34.2378735542, 3935.3394508362)):
            Rectangle(F0_W_11, F0_H_11)
    extrude(amount=F25_DEPTH)


with BuildPart() as f25b:
    # F0 (on Top) → F25, piece 2 (new body)
    with BuildSketch(Plane.XY):
        Polygon((-37.1261909604, -26.347534731), (-37.1261909604, -822.1663832664), (597.9725122452, -822.1663832664), (597.9725122452, 845.5312275887), (-37.1261909604, 845.5312275887), align=None)
    extrude(amount=F25_DEPTH)


with BuildPart() as f26:
    # F0 (on Top) → F26 (new body)
    with BuildSketch(Plane.XY):
        with Locations((-1673.9757061005, 3049.9031543732)):
            Circle(F0_R_4)
    extrude(amount=F26_DEPTH)


with BuildPart() as f27:
    # F0 (on Top) → F27 (new body)
    with BuildSketch(Plane.XY):
        with Locations((5032.7116012573, 3143.6318397522)):
            Rectangle(F0_W_12, F0_H_12)
        with Locations((5031.8699836731, 3149.9679946899)):
            Rectangle(F0_W_13, F0_H_13, mode=Mode.SUBTRACT)
    extrude(amount=F27_DEPTH)


with BuildPart() as f28:
    # F0 (on Top) → F28 (new body)
    with BuildSketch(Plane.XY):
        with Locations((5031.8699836731, 3149.9679946899)):
            Rectangle(F0_W_13, F0_H_13)
    extrude(amount=F28_DEPTH)


solid = Compound([f1.part, f1b.part, f1c.part, f1d.part, f1e.part, f2.part, f2b.part, f2c.part, f4.part, f5.part, f6.part, f12.part, f13.part, f14_1.part, f17.part, f17b.part, f24.part, f25.part, f25b.part, f26.part, f27.part, f28.part])
